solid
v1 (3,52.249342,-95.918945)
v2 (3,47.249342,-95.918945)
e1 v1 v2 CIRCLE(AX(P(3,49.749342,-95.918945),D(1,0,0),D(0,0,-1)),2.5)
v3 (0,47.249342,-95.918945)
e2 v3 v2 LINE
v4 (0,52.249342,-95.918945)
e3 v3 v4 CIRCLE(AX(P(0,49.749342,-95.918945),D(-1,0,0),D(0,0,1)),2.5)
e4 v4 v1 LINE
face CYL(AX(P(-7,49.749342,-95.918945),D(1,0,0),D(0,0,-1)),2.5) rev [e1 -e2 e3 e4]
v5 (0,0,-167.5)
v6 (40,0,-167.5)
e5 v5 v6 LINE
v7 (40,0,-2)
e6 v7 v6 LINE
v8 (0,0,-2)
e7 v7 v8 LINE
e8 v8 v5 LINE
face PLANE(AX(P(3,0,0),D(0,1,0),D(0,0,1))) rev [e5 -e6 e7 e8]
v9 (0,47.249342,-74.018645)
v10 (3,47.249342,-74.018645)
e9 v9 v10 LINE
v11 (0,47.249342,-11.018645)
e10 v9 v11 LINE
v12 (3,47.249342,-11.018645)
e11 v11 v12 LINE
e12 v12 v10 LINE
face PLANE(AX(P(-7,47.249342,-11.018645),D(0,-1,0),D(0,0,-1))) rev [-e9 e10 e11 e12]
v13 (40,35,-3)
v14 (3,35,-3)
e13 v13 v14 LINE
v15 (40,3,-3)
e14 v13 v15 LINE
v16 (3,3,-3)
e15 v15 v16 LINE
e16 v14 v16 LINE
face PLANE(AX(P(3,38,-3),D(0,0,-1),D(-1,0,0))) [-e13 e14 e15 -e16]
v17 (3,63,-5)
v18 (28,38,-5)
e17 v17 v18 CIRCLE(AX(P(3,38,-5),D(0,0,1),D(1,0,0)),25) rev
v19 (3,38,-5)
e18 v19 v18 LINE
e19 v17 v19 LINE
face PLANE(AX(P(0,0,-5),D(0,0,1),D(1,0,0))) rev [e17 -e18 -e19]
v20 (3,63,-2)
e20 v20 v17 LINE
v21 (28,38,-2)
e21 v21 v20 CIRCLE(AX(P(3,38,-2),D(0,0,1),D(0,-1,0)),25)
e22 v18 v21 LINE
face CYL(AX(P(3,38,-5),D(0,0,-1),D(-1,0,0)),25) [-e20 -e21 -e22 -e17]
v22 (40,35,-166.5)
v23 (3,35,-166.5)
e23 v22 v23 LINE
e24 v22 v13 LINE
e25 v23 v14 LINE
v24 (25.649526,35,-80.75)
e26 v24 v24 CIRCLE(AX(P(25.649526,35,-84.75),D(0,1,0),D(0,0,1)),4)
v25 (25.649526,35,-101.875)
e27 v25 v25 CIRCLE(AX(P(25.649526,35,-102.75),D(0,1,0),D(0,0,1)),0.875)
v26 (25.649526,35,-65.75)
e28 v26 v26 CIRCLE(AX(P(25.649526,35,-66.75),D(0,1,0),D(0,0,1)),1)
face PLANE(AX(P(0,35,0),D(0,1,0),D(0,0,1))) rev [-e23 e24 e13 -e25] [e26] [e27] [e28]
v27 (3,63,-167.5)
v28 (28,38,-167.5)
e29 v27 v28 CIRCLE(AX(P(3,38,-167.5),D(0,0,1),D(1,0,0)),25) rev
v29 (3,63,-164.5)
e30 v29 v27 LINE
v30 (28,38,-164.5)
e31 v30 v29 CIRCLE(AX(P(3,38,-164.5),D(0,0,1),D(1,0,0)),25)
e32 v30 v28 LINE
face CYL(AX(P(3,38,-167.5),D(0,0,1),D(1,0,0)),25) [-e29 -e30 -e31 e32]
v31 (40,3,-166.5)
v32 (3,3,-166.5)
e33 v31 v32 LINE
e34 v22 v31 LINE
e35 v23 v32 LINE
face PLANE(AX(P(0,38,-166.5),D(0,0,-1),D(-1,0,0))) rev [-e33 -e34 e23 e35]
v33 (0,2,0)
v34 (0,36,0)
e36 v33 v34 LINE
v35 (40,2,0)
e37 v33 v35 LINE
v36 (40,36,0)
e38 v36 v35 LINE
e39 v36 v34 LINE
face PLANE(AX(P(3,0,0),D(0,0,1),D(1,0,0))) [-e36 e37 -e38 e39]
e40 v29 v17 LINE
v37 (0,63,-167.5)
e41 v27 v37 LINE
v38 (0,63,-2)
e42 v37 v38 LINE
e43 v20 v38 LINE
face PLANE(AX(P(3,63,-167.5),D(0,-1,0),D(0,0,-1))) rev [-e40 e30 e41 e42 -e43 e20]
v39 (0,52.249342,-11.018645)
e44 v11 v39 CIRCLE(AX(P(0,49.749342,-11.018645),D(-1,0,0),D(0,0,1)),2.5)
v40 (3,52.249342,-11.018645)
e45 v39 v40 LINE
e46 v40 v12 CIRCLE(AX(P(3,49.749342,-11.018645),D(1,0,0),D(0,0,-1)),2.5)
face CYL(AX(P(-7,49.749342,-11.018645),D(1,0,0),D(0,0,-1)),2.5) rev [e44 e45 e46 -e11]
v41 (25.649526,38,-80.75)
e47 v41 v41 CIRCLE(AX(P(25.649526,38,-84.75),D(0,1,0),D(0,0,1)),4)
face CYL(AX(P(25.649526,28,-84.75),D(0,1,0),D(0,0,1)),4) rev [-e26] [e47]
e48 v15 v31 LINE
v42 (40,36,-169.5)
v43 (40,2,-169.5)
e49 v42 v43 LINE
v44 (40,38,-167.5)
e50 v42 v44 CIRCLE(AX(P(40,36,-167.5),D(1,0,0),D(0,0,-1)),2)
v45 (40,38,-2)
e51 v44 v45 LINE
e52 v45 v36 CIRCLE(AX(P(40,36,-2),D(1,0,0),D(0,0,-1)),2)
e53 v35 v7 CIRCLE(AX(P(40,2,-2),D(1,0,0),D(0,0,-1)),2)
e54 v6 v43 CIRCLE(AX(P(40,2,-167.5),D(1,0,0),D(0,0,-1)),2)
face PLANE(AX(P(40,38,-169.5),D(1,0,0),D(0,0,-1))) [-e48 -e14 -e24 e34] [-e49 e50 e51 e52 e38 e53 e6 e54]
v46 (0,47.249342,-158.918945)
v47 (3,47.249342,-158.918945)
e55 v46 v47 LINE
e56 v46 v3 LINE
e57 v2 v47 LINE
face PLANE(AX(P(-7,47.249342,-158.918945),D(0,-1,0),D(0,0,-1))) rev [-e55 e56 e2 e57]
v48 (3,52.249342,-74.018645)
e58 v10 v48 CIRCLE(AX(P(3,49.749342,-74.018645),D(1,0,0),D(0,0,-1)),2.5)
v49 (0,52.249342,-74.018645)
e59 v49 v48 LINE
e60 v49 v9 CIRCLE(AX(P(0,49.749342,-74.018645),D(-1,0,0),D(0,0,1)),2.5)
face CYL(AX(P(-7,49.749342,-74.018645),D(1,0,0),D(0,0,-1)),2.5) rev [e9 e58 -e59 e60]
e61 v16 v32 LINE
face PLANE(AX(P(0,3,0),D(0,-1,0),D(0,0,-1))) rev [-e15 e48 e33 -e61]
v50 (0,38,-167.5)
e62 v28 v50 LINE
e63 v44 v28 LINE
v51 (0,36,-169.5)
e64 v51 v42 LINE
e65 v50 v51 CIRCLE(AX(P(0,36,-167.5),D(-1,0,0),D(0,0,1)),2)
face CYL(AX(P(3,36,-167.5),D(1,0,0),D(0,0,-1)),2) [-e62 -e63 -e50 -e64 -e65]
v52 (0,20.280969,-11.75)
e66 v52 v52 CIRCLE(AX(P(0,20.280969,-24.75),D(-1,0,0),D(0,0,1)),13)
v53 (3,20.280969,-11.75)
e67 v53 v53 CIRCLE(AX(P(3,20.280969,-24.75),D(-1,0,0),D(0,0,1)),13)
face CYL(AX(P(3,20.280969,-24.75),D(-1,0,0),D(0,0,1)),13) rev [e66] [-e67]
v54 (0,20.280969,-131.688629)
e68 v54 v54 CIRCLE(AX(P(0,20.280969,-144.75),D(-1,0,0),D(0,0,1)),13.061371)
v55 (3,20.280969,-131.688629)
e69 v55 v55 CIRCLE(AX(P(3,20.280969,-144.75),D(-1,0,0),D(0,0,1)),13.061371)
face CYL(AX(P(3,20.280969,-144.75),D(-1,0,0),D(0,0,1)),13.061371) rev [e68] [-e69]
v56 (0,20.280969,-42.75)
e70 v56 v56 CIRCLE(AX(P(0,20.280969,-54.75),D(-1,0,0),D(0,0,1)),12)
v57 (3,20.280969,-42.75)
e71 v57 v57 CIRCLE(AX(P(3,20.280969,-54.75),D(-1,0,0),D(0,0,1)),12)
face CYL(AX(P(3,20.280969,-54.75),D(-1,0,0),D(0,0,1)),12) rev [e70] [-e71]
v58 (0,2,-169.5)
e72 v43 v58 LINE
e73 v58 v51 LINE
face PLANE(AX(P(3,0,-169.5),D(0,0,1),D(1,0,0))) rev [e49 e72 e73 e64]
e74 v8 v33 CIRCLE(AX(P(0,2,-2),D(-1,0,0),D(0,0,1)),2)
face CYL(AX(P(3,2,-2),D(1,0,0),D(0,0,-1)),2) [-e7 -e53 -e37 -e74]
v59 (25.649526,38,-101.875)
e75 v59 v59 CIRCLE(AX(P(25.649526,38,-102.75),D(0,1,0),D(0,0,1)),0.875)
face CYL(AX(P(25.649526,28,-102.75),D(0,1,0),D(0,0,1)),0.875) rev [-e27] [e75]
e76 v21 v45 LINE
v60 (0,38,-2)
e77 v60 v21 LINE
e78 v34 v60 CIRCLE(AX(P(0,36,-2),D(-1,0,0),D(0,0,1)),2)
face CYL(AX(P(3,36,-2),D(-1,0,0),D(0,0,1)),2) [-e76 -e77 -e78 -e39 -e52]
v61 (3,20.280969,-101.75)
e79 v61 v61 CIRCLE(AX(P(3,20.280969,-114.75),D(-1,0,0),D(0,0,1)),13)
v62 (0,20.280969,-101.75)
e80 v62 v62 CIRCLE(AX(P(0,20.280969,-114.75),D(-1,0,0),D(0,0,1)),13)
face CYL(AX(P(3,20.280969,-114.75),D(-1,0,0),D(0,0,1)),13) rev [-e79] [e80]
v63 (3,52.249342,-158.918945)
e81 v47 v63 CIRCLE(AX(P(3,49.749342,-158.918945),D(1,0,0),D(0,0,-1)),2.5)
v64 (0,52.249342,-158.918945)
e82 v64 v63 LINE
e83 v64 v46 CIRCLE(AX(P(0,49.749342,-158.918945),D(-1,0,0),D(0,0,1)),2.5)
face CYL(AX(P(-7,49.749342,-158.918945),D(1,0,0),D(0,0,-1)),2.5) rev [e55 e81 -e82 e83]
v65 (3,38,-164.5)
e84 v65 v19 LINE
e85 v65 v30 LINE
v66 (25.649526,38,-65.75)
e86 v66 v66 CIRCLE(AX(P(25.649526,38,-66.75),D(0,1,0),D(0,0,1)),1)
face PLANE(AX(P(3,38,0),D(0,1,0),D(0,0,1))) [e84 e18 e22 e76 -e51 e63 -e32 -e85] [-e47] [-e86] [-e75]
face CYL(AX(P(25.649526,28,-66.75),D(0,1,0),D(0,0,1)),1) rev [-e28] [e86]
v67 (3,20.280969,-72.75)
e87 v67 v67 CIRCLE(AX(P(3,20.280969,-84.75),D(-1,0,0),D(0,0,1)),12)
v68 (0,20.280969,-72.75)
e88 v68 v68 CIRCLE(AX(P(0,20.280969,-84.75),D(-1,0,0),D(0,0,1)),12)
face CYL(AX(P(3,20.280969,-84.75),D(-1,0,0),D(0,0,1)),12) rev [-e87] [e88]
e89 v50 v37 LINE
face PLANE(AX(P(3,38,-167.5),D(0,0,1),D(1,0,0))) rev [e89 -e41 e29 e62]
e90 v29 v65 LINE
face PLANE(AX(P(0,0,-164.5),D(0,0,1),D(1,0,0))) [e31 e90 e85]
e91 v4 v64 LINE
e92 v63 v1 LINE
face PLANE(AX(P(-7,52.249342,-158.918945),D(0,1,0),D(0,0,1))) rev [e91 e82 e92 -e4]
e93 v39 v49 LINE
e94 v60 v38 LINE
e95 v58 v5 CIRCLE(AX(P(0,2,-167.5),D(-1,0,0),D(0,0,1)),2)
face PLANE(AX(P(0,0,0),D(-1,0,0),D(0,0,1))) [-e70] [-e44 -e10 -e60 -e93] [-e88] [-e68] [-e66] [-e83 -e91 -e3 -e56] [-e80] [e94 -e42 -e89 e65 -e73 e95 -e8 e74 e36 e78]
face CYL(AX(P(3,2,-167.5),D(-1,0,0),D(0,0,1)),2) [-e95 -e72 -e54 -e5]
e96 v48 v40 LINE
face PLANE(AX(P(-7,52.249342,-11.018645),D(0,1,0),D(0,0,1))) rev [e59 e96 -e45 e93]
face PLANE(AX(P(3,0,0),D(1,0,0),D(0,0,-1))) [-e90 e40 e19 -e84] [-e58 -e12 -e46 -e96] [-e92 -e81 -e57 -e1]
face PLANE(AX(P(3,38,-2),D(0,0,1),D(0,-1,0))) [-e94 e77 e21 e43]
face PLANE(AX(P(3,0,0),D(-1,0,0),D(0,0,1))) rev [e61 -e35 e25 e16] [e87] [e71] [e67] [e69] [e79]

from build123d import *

# Parameters (mm, degrees)
SKETCH1_W            = 169.5
SKETCH1_H            = 38
BOSS_EXTRUDE1_DEPTH  = 3
SKETCH12_W           = 40
SKETCH12_H           = 3
BOSS_EXTRUDE3_DEPTH  = 38
SKETCH16_W           = 37
SKETCH16_H           = 3
BOSS_EXTRUDE4_DEPTH  = 38
SKETCH18_W           = 37
SKETCH18_H           = 163.5
BOSS_EXTRUDE5_DEPTH  = 3
FILLET1_R            = 2
FILLET2_R            = 2
FILLET3_R            = 2
FILLET4_R            = 2
SKETCH37_W           = 165.5
SKETCH37_H           = 25
BOSS_EXTRUDE12_DEPTH = 3
SKETCH40_W           = 25
SKETCH40_H           = 25
BOSS_EXTRUDE13_DEPTH = 3
FILLET11_R           = 25
SKETCH41_W           = 25
SKETCH41_H           = 25
BOSS_EXTRUDE14_DEPTH = 3
FILLET12_R           = 25
CUT_EXTRUDE19_DEPTH  = 10
SKETCH62_R           = 4
CUT_EXTRUDE23_DEPTH  = 10
SKETCH66_R           = 0.875
CUT_EXTRUDE24_DEPTH  = 10
SKETCH63_R           = 1
CUT_EXTRUDE26_DEPTH  = 10
SKETCH19_W           = 37
SKETCH19_H           = 163.5
BOSS_EXTRUDE16_DEPTH = 3
SKETCH123_R          = 13.061371159
CUT_EXTRUDE30_DEPTH  = 3
SKETCH125_R          = 13
CUT_EXTRUDE31_DEPTH  = 3
SKETCH126_R          = 13
CUT_EXTRUDE32_DEPTH  = 3
SKETCH67_R           = 12
CUT_EXTRUDE33_DEPTH  = 3
SKETCH118_R          = 12
CUT_EXTRUDE34_DEPTH  = 3


with BuildPart() as part:
    # Sketch1 → Boss-Extrude1 (new body)
    with BuildSketch(Plane(origin=(0, 0, 0), x_dir=(0, 0, -1), z_dir=(1, 0, 0))):
        with Locations((84.75, 19)):
            Rectangle(SKETCH1_W, SKETCH1_H)
    extrude(amount=BOSS_EXTRUDE1_DEPTH)

    # Sketch12 → Boss-Extrude3 (add)
    with BuildSketch(Plane(origin=(0, 0, -169.5), x_dir=(1, 0, 0), z_dir=(0, 1, 0))):
        with Locations((20, -1.5)):
            Rectangle(SKETCH12_W, SKETCH12_H)
    extrude(amount=BOSS_EXTRUDE3_DEPTH)

    # Sketch16 → Boss-Extrude4 (add)
    with BuildSketch(Plane(origin=(3, 0, 0), x_dir=(1, 0, 0), z_dir=(0, 1, 0))):
        with Locations((18.5, 1.5)):
            Rectangle(SKETCH16_W, SKETCH16_H)
    extrude(amount=BOSS_EXTRUDE4_DEPTH)

    # Sketch18 → Boss-Extrude5 (add)
    with BuildSketch(Plane(origin=(0, 38, 0), x_dir=(1, 0, 0), z_dir=(0, 1, 0))):
        with Locations((21.5, 84.75)):
            Rectangle(SKETCH18_W, SKETCH18_H)
    extrude(amount=-BOSS_EXTRUDE5_DEPTH)

    # Fillet1
    fillet1_edges = [part.edges().sort_by_distance(p)[0] for p in [
        (20, 0, 0),
    ]]
    fillet(fillet1_edges, radius=FILLET1_R)

    # Fillet2
    fillet2_edges = [part.edges().sort_by_distance(p)[0] for p in [
        (20, 38, 0),
    ]]
    fillet(fillet2_edges, radius=FILLET2_R)

    # Fillet3
    fillet3_edges = [part.edges().sort_by_distance(p)[0] for p in [
        (20, 38, -169.5),
    ]]
    fillet(fillet3_edges, radius=FILLET3_R)

    # Fillet4
    fillet4_edges = [part.edges().sort_by_distance(p)[0] for p in [
        (20, 0, -169.5),
    ]]
    fillet(fillet4_edges, radius=FILLET4_R)

    # Sketch37 → Boss-Extrude12 (add)
    with BuildSketch(Plane.ZY):
        with Locations((-84.75, 50.5)):
            Rectangle(SKETCH37_W, SKETCH37_H)
    extrude(amount=-BOSS_EXTRUDE12_DEPTH)

    # Sketch40 → Boss-Extrude13 (add)
    with BuildSketch(Plane(origin=(0, 0, -167.5), x_dir=(-1, 0, 0), z_dir=(0, 0, -1))):
        with Locations((-15.5, 50.5)):
            Rectangle(SKETCH40_W, SKETCH40_H)
    extrude(amount=-BOSS_EXTRUDE13_DEPTH)

    # Fillet11
    fillet11_edges = [part.edges().sort_by_distance(p)[0] for p in [
        (28, 63, -166),
    ]]
    fillet(fillet11_edges, radius=FILLET11_R - 0.0001)  # a hair under: the kernel refuses the full size

    # Sketch41 → Boss-Extrude14 (add)
    with BuildSketch(Plane.XY.offset(-2)):
        with Locations((15.5, 50.5)):
            Rectangle(SKETCH41_W, SKETCH41_H)
    extrude(amount=-BOSS_EXTRUDE14_DEPTH)

    # Fillet12
    fillet12_edges = [part.edges().sort_by_distance(p)[0] for p in [
        (28, 63, -3.5),
    ]]
    fillet(fillet12_edges, radius=FILLET12_R - 0.0001)  # a hair under: the kernel refuses the full size

    # Sketch57 → Cut-Extrude19 (cut)
    with BuildSketch(Plane(origin=(3, 0, 0), x_dir=(0, 0, -1), z_dir=(1, 0, 0))):
        with BuildLine():
            Line((11.018645082, 52.249341523), (74.018645082, 52.249341523))
            ThreePointArc((74.018645082, 52.249341523), (76.518645082, 49.749341523), (74.018645082, 47.249341523))
            Line((74.018645082, 47.249341523), (11.018645082, 47.249341523))
            ThreePointArc((11.018645082, 47.249341523), (8.518645082, 49.749341523), (11.018645082, 52.249341523))
        make_face()
        with BuildLine():
            Line((158.918944647, 47.24934152), (95.918944647, 47.24934152))
            ThreePointArc((95.918944647, 47.24934152), (93.418944647, 49.74934152), (95.918944647, 52.24934152))
            Line((95.918944647, 52.24934152), (158.918944647, 52.24934152))
            ThreePointArc((158.918944647, 52.24934152), (161.418944647, 49.74934152), (158.918944647, 47.24934152))
        make_face()
    extrude(amount=-CUT_EXTRUDE19_DEPTH, mode=Mode.SUBTRACT)

    # Sketch62 → Cut-Extrude23 (cut)
    with BuildSketch(Plane(origin=(0, 38, 0), x_dir=(1, 0, 0), z_dir=(0, 1, 0))):
        with Locations(Location((25.649526178, 84.75, 0), (0, 0, 270))):
            Circle(SKETCH62_R)
    extrude(amount=-CUT_EXTRUDE23_DEPTH, mode=Mode.SUBTRACT)

    # Sketch66 → Cut-Extrude24 (cut)
    with BuildSketch(Plane(origin=(0, 38, 0), x_dir=(1, 0, 0), z_dir=(0, 1, 0))):
        with Locations(Location((25.649526178, 102.75, 0), (0, 0, 270))):
            Circle(SKETCH66_R)
    extrude(amount=-CUT_EXTRUDE24_DEPTH, mode=Mode.SUBTRACT)

    # Sketch63 → Cut-Extrude26 (cut)
    with BuildSketch(Plane(origin=(0, 38, 0), x_dir=(1, 0, 0), z_dir=(0, 1, 0))):
        with Locations(Location((25.649526178, 66.75, 0), (0, 0, 270))):
            Circle(SKETCH63_R)
    extrude(amount=-CUT_EXTRUDE26_DEPTH, mode=Mode.SUBTRACT)

    # Sketch19 → Boss-Extrude16 (add)
    with BuildSketch(Plane(origin=(0, 0, 0), x_dir=(-1, 0, 0), z_dir=(0, -1, 0))):
        with Locations((-21.5, 84.75)):
            Rectangle(SKETCH19_W, SKETCH19_H)
    extrude(amount=-BOSS_EXTRUDE16_DEPTH)

    # Sketch123 → Cut-Extrude30 (cut)
    with BuildSketch(Plane.ZY):
        with Locations((-144.75, 20.2809694)):
            Circle(SKETCH123_R)
    extrude(amount=-CUT_EXTRUDE30_DEPTH, mode=Mode.SUBTRACT)

    # Sketch125 → Cut-Extrude31 (cut)
    with BuildSketch(Plane.ZY):
        with Locations((-24.75, 20.2809694)):
            Circle(SKETCH125_R)
    extrude(amount=-CUT_EXTRUDE31_DEPTH, mode=Mode.SUBTRACT)

    # Sketch126 → Cut-Extrude32 (cut)
    with BuildSketch(Plane.ZY):
        with Locations((-114.75, 20.2809694)):
            Circle(SKETCH126_R)
    extrude(amount=-CUT_EXTRUDE32_DEPTH, mode=Mode.SUBTRACT)

    # Sketch67 → Cut-Extrude33 (cut)
    with BuildSketch(Plane.ZY):
        with Locations((-84.75, 20.2809694)):
            Circle(SKETCH67_R)
    extrude(amount=-CUT_EXTRUDE33_DEPTH, mode=Mode.SUBTRACT)

    # Sketch118 → Cut-Extrude34 (cut)
    with BuildSketch(Plane.ZY):
        with Locations((-54.75, 20.2809694)):
            Circle(SKETCH118_R)
    extrude(amount=-CUT_EXTRUDE34_DEPTH, mode=Mode.SUBTRACT)


solid = part.part
